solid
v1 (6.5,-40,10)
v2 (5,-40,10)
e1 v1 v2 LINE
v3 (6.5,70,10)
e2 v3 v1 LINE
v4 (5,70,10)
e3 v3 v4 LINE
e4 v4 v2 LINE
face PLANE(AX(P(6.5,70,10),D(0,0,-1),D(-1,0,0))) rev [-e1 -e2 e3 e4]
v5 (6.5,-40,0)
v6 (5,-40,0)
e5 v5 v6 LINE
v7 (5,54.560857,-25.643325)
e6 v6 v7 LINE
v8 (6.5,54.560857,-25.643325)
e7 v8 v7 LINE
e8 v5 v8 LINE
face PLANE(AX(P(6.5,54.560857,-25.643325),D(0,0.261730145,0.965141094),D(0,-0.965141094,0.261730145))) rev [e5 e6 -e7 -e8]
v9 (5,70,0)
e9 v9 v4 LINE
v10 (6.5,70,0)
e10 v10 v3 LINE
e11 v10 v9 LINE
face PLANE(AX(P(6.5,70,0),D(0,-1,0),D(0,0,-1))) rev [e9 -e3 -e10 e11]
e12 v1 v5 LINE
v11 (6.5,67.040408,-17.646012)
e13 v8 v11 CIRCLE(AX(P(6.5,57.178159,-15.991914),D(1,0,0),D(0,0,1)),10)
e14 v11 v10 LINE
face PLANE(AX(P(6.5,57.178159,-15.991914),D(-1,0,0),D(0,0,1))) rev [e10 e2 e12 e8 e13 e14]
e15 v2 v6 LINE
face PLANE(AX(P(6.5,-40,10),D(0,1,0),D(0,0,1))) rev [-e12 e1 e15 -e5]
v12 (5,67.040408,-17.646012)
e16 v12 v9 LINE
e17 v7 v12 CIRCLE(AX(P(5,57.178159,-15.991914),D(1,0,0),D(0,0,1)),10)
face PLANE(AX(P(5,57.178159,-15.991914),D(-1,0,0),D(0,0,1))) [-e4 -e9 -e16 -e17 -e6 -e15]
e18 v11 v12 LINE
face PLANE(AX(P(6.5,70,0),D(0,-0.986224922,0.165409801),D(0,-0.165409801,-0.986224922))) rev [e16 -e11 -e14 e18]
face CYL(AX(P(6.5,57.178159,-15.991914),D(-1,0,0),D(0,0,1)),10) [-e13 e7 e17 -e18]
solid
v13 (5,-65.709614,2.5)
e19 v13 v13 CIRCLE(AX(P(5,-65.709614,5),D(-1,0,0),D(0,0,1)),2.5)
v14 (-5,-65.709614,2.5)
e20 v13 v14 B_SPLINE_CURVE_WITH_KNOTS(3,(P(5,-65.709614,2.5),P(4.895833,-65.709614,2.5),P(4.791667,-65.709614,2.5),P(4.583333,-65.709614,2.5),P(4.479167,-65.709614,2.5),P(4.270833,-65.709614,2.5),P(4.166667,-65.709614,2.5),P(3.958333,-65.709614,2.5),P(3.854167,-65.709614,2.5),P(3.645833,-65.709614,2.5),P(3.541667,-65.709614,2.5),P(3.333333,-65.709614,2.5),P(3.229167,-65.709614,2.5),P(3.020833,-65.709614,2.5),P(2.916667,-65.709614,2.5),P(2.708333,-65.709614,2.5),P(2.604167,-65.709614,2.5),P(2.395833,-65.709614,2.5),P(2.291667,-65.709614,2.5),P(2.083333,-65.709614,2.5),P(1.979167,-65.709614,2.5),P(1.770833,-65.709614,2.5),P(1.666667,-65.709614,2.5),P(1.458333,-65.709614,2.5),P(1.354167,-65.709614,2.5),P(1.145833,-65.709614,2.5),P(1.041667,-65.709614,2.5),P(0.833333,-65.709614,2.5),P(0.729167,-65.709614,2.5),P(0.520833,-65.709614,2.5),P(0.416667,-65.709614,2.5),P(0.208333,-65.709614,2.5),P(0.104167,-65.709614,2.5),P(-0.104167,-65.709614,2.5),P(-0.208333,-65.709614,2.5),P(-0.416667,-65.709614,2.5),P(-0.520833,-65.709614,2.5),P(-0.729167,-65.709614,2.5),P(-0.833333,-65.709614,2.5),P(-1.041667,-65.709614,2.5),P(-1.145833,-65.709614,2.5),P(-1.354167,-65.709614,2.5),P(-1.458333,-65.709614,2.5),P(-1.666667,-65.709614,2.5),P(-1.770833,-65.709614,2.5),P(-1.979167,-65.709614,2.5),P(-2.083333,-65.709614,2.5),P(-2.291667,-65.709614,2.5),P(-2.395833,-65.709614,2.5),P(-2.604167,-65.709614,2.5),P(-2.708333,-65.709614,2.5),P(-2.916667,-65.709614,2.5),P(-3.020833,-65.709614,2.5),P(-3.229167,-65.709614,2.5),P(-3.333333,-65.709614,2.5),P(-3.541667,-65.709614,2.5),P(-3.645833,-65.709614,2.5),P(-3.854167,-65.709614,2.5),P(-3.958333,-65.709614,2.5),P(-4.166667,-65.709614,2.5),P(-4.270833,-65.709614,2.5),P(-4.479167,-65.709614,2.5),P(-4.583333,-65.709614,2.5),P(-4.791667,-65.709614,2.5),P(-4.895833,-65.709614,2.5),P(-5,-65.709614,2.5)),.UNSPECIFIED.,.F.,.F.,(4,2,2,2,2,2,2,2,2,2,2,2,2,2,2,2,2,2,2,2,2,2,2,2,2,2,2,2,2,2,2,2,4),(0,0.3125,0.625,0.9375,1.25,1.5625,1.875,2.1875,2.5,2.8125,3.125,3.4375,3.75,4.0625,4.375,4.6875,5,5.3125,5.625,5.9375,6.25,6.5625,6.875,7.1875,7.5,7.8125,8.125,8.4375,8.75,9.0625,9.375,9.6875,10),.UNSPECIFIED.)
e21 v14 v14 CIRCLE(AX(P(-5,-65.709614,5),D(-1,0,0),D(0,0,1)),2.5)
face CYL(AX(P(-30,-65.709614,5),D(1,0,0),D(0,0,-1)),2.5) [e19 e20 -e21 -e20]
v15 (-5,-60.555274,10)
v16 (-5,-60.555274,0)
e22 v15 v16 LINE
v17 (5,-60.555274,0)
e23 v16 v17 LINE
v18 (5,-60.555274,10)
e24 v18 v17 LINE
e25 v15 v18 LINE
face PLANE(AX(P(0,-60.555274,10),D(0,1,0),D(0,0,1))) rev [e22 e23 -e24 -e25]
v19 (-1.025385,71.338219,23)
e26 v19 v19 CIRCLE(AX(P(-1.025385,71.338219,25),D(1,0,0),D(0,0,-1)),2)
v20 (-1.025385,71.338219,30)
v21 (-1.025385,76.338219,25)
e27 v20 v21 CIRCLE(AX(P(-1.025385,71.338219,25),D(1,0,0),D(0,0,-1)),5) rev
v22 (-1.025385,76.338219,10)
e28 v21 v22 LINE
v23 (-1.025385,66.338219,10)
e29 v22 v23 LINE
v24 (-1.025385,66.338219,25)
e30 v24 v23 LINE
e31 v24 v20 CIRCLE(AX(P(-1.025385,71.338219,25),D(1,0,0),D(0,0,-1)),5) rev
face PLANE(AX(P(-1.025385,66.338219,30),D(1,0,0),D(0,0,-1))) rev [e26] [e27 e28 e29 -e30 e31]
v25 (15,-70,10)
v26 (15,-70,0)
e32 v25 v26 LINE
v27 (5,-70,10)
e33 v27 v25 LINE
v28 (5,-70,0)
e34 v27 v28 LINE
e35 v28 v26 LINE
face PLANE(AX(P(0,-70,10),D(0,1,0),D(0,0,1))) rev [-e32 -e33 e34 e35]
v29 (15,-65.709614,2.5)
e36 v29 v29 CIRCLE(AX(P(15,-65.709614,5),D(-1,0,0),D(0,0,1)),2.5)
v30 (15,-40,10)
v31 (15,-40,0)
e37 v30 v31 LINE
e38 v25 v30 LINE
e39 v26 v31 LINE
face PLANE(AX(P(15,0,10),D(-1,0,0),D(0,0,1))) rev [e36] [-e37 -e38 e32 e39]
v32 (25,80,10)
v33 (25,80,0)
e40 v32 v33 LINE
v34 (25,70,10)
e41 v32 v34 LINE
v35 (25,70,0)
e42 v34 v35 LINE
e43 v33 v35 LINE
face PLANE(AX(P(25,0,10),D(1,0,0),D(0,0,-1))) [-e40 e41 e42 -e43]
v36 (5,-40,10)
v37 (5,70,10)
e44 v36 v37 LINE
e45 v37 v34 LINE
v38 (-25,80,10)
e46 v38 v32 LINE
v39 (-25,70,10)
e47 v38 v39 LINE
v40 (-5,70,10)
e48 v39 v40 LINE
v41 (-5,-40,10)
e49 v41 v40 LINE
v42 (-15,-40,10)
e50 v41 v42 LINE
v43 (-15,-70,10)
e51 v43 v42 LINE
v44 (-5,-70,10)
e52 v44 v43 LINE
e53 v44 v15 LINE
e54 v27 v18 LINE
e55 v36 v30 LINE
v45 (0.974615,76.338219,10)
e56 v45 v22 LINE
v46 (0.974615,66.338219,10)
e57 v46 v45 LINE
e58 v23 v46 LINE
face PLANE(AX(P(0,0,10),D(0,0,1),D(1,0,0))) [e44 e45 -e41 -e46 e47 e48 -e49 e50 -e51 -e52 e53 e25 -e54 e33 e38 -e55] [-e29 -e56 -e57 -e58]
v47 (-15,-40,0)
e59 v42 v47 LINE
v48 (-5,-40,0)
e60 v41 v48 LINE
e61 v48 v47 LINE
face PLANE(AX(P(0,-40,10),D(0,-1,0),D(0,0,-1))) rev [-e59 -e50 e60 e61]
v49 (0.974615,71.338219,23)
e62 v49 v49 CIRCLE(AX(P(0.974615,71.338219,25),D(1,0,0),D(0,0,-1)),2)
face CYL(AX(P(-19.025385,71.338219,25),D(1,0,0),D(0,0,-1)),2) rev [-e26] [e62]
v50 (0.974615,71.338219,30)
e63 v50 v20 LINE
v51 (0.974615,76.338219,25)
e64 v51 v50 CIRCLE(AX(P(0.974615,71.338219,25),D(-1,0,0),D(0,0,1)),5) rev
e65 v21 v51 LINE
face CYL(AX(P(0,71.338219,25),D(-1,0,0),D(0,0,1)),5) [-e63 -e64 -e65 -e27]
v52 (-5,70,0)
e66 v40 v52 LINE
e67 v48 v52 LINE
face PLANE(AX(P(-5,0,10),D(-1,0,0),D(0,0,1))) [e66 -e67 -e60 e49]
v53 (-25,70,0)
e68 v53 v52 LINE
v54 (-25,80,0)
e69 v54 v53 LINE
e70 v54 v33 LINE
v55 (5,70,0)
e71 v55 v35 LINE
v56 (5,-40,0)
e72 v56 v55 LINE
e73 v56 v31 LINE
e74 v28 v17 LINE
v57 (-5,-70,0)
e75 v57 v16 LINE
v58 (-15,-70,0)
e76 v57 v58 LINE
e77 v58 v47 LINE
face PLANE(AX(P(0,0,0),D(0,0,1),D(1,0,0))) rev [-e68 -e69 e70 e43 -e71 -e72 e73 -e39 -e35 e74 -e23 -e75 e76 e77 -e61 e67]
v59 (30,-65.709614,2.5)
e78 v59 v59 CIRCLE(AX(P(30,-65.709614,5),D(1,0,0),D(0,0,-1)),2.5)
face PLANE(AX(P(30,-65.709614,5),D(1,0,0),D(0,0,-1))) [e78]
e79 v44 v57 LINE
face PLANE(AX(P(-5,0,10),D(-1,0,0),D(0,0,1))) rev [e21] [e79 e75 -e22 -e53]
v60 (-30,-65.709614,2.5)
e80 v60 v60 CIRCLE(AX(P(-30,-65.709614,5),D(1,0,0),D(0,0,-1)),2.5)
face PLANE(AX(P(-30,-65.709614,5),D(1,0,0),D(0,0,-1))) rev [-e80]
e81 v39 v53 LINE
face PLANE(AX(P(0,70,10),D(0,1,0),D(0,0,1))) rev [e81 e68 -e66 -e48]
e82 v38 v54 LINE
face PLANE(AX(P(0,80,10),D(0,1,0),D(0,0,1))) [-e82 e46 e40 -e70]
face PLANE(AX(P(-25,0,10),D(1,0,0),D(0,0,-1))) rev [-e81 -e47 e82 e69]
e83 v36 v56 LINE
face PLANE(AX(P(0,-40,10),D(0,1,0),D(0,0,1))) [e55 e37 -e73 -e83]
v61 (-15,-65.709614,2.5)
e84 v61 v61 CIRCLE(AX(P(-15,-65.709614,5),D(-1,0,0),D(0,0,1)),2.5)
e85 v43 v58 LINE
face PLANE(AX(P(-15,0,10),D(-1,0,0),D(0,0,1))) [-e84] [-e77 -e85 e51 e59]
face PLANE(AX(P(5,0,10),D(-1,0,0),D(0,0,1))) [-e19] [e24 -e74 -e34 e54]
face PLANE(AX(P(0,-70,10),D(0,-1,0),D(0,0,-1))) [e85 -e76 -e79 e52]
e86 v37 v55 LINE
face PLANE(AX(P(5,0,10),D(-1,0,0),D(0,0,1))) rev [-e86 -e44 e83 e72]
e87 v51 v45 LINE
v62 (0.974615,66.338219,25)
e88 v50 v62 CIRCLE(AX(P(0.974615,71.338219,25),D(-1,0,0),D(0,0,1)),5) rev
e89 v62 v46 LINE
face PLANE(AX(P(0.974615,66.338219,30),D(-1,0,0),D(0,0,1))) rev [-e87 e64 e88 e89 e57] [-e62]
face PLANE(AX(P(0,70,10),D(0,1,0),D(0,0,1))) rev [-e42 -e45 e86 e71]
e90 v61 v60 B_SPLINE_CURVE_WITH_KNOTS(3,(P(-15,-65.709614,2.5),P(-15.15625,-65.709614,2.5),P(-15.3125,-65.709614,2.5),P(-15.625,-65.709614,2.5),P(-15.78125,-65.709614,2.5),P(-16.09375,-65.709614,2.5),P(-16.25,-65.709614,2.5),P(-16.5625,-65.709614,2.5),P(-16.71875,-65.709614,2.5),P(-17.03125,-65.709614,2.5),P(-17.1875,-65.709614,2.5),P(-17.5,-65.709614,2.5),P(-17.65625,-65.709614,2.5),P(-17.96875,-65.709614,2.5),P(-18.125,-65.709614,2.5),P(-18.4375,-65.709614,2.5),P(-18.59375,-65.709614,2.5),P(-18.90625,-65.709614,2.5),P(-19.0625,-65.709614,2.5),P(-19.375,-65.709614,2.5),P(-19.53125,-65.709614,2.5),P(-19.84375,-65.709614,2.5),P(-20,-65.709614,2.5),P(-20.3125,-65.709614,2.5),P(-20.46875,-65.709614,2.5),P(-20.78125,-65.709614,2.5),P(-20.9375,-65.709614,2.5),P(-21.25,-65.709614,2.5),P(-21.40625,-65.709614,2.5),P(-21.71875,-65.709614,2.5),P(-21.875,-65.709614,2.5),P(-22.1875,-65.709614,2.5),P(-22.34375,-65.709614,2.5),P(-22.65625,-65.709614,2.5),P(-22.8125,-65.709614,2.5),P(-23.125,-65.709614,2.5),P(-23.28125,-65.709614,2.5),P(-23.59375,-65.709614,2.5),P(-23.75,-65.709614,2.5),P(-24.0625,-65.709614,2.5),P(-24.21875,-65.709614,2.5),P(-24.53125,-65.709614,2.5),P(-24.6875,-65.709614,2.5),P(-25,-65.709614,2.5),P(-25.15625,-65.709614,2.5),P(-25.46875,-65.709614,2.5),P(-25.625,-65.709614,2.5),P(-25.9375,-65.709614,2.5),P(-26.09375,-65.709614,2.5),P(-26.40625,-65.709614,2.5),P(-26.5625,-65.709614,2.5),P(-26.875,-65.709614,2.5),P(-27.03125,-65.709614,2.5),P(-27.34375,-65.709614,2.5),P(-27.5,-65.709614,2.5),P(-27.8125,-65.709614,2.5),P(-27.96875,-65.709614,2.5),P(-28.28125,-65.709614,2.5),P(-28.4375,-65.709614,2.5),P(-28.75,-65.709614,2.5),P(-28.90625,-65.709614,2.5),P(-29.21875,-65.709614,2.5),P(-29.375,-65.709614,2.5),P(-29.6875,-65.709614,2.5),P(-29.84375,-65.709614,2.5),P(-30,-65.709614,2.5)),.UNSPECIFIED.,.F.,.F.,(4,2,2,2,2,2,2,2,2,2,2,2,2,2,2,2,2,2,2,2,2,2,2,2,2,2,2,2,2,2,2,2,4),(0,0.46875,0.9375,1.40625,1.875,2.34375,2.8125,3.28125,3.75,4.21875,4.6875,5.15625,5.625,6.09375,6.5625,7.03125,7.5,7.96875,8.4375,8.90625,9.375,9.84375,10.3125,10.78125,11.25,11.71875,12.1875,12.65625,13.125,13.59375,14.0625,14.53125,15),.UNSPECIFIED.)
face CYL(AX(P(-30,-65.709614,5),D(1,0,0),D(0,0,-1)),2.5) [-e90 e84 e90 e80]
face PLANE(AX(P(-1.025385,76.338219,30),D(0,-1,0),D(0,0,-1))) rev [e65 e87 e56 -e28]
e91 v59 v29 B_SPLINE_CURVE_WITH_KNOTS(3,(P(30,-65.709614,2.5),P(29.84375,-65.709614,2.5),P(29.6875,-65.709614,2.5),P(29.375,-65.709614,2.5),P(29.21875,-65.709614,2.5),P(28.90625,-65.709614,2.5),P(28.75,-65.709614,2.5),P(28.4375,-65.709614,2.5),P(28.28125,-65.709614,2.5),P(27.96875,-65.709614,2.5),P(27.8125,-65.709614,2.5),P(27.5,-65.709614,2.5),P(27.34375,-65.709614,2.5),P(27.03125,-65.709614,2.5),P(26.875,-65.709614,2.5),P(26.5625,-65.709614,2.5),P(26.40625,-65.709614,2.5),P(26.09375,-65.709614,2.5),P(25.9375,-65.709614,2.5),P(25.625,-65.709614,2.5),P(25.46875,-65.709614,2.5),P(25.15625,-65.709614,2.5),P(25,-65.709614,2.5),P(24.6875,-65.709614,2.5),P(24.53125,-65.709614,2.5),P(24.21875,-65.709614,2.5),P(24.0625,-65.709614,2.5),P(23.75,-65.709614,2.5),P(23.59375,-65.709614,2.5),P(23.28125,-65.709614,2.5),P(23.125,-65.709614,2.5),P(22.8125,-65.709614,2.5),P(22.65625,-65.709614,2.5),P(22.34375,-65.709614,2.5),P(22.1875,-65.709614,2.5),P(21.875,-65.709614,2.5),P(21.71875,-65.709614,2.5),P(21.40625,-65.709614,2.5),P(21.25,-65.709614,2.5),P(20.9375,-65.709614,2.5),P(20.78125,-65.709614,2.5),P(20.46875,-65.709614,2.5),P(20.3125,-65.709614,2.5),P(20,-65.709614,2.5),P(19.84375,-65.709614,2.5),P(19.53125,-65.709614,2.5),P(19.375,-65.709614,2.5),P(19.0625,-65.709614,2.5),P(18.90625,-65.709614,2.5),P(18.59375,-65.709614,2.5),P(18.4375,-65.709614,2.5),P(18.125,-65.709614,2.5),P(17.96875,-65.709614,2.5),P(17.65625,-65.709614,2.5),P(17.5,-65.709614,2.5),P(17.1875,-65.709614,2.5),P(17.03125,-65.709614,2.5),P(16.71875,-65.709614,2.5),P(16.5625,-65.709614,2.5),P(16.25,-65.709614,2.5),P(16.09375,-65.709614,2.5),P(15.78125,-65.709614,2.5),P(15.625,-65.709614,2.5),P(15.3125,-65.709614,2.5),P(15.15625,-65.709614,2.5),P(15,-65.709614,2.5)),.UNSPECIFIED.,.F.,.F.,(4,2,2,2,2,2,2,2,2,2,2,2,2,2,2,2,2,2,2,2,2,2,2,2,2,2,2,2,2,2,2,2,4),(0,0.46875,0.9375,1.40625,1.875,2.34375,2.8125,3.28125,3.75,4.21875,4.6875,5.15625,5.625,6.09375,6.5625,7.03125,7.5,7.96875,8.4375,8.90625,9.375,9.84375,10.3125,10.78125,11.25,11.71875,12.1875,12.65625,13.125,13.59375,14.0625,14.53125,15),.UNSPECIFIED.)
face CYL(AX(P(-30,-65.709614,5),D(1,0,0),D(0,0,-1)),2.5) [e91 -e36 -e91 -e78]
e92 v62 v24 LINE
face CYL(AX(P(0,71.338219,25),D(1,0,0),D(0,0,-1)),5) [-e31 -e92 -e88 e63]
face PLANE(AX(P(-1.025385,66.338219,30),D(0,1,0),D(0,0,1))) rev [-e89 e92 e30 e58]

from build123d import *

# Parameters (mm, degrees)
BOSS_EXTRUDE1_DEPTH      = 10
SKETCH5_W                = 2
SKETCH5_H                = 10
BOSS_EXTRUDE2_DEPTH      = 20
FILLET1_R                = 5
SKETCH6_R                = 2
CUT_EXTRUDE2_DEPTH       = 20
BOSS_EXTRUDE3_DEPTH      = 1.5
BOSS_EXTRUDE4_DEPTH      = 15
BOSS_EXTRUDE4_DEPTH_BACK = 45
SKETCH2_R                = 2.5


with BuildPart() as part:
    # Sketch1 → Boss-Extrude1 (new body)
    with BuildSketch(Plane.XY):
        Polygon((-5, 70), (5, 70), (25, 70), (25, 80), (-25, 80), (-25, 70), align=None)
        Polygon((5, -60.555274141), (5, -40), (5, 70), (-5, 70), (-5, -40), (-5, -60.555274141), align=None)
        Polygon((-5, -70), (-5, -60.555274141), (-5, -40), (-15, -40), (-15, -70), align=None)
        Polygon((5, -70), (15, -70), (15, -40), (5, -40), (5, -60.555274141), align=None)
    extrude(amount=BOSS_EXTRUDE1_DEPTH)

    # Sketch5 → Boss-Extrude2 (add)
    with BuildSketch(Plane.XY.offset(10)):
        with Locations((-0.025385346, 71.338218607)):
            Rectangle(SKETCH5_W, SKETCH5_H)
    extrude(amount=BOSS_EXTRUDE2_DEPTH)

    # Fillet1
    fillet1_edges = [part.edges().sort_by_distance(p)[0] for p in [
        (-0.025385346, 66.338218607, 30),
        (-0.025385346, 76.338218607, 30),
    ]]
    fillet(fillet1_edges, radius=FILLET1_R - 0.0001)  # a hair under: the kernel refuses the full size

    # Sketch6 → Cut-Extrude2 (cut)
    with BuildSketch(Plane(origin=(0.974614654, 0, 0), x_dir=(0, 0, -1), z_dir=(1, 0, 0))):
        with Locations((-25, 71.338218607)):
            Circle(SKETCH6_R)
    extrude(amount=-CUT_EXTRUDE2_DEPTH, mode=Mode.SUBTRACT)

    # Sketch2 → Boss-Extrude4 (add, two sides: drawn at the far end of the back side and taken through both)
    with BuildSketch(Plane(origin=(15, 0, 0), x_dir=(0, 0, -1), z_dir=(1, 0, 0)).offset(-BOSS_EXTRUDE4_DEPTH_BACK)):
        with Locations((-5, -65.709613715)):
            Circle(SKETCH2_R)
    extrude(amount=BOSS_EXTRUDE4_DEPTH + BOSS_EXTRUDE4_DEPTH_BACK)


with BuildPart() as body_2:
    # Sketch7 → Boss-Extrude3 (new body)
    with BuildSketch(Plane(origin=(5, 0, 0), x_dir=(0, 0, -1), z_dir=(1, 0, 0))):
        with BuildLine():
            Line((0, 70), (17.646012218, 67.040408019))
            ThreePointArc((17.646012218, 67.040408019), (24.41144088, 62.573672726), (25.643325146, 54.560857346))
            Line((25.643325146, 54.560857346), (0, -40))
            Line((0, -40), (-10, -40))
            Line((-10, -40), (-10, 70))
            Line((-10, 70), (0, 70))
        make_face()
    extrude(amount=BOSS_EXTRUDE3_DEPTH)


solid = Compound([part.part, body_2.part])
